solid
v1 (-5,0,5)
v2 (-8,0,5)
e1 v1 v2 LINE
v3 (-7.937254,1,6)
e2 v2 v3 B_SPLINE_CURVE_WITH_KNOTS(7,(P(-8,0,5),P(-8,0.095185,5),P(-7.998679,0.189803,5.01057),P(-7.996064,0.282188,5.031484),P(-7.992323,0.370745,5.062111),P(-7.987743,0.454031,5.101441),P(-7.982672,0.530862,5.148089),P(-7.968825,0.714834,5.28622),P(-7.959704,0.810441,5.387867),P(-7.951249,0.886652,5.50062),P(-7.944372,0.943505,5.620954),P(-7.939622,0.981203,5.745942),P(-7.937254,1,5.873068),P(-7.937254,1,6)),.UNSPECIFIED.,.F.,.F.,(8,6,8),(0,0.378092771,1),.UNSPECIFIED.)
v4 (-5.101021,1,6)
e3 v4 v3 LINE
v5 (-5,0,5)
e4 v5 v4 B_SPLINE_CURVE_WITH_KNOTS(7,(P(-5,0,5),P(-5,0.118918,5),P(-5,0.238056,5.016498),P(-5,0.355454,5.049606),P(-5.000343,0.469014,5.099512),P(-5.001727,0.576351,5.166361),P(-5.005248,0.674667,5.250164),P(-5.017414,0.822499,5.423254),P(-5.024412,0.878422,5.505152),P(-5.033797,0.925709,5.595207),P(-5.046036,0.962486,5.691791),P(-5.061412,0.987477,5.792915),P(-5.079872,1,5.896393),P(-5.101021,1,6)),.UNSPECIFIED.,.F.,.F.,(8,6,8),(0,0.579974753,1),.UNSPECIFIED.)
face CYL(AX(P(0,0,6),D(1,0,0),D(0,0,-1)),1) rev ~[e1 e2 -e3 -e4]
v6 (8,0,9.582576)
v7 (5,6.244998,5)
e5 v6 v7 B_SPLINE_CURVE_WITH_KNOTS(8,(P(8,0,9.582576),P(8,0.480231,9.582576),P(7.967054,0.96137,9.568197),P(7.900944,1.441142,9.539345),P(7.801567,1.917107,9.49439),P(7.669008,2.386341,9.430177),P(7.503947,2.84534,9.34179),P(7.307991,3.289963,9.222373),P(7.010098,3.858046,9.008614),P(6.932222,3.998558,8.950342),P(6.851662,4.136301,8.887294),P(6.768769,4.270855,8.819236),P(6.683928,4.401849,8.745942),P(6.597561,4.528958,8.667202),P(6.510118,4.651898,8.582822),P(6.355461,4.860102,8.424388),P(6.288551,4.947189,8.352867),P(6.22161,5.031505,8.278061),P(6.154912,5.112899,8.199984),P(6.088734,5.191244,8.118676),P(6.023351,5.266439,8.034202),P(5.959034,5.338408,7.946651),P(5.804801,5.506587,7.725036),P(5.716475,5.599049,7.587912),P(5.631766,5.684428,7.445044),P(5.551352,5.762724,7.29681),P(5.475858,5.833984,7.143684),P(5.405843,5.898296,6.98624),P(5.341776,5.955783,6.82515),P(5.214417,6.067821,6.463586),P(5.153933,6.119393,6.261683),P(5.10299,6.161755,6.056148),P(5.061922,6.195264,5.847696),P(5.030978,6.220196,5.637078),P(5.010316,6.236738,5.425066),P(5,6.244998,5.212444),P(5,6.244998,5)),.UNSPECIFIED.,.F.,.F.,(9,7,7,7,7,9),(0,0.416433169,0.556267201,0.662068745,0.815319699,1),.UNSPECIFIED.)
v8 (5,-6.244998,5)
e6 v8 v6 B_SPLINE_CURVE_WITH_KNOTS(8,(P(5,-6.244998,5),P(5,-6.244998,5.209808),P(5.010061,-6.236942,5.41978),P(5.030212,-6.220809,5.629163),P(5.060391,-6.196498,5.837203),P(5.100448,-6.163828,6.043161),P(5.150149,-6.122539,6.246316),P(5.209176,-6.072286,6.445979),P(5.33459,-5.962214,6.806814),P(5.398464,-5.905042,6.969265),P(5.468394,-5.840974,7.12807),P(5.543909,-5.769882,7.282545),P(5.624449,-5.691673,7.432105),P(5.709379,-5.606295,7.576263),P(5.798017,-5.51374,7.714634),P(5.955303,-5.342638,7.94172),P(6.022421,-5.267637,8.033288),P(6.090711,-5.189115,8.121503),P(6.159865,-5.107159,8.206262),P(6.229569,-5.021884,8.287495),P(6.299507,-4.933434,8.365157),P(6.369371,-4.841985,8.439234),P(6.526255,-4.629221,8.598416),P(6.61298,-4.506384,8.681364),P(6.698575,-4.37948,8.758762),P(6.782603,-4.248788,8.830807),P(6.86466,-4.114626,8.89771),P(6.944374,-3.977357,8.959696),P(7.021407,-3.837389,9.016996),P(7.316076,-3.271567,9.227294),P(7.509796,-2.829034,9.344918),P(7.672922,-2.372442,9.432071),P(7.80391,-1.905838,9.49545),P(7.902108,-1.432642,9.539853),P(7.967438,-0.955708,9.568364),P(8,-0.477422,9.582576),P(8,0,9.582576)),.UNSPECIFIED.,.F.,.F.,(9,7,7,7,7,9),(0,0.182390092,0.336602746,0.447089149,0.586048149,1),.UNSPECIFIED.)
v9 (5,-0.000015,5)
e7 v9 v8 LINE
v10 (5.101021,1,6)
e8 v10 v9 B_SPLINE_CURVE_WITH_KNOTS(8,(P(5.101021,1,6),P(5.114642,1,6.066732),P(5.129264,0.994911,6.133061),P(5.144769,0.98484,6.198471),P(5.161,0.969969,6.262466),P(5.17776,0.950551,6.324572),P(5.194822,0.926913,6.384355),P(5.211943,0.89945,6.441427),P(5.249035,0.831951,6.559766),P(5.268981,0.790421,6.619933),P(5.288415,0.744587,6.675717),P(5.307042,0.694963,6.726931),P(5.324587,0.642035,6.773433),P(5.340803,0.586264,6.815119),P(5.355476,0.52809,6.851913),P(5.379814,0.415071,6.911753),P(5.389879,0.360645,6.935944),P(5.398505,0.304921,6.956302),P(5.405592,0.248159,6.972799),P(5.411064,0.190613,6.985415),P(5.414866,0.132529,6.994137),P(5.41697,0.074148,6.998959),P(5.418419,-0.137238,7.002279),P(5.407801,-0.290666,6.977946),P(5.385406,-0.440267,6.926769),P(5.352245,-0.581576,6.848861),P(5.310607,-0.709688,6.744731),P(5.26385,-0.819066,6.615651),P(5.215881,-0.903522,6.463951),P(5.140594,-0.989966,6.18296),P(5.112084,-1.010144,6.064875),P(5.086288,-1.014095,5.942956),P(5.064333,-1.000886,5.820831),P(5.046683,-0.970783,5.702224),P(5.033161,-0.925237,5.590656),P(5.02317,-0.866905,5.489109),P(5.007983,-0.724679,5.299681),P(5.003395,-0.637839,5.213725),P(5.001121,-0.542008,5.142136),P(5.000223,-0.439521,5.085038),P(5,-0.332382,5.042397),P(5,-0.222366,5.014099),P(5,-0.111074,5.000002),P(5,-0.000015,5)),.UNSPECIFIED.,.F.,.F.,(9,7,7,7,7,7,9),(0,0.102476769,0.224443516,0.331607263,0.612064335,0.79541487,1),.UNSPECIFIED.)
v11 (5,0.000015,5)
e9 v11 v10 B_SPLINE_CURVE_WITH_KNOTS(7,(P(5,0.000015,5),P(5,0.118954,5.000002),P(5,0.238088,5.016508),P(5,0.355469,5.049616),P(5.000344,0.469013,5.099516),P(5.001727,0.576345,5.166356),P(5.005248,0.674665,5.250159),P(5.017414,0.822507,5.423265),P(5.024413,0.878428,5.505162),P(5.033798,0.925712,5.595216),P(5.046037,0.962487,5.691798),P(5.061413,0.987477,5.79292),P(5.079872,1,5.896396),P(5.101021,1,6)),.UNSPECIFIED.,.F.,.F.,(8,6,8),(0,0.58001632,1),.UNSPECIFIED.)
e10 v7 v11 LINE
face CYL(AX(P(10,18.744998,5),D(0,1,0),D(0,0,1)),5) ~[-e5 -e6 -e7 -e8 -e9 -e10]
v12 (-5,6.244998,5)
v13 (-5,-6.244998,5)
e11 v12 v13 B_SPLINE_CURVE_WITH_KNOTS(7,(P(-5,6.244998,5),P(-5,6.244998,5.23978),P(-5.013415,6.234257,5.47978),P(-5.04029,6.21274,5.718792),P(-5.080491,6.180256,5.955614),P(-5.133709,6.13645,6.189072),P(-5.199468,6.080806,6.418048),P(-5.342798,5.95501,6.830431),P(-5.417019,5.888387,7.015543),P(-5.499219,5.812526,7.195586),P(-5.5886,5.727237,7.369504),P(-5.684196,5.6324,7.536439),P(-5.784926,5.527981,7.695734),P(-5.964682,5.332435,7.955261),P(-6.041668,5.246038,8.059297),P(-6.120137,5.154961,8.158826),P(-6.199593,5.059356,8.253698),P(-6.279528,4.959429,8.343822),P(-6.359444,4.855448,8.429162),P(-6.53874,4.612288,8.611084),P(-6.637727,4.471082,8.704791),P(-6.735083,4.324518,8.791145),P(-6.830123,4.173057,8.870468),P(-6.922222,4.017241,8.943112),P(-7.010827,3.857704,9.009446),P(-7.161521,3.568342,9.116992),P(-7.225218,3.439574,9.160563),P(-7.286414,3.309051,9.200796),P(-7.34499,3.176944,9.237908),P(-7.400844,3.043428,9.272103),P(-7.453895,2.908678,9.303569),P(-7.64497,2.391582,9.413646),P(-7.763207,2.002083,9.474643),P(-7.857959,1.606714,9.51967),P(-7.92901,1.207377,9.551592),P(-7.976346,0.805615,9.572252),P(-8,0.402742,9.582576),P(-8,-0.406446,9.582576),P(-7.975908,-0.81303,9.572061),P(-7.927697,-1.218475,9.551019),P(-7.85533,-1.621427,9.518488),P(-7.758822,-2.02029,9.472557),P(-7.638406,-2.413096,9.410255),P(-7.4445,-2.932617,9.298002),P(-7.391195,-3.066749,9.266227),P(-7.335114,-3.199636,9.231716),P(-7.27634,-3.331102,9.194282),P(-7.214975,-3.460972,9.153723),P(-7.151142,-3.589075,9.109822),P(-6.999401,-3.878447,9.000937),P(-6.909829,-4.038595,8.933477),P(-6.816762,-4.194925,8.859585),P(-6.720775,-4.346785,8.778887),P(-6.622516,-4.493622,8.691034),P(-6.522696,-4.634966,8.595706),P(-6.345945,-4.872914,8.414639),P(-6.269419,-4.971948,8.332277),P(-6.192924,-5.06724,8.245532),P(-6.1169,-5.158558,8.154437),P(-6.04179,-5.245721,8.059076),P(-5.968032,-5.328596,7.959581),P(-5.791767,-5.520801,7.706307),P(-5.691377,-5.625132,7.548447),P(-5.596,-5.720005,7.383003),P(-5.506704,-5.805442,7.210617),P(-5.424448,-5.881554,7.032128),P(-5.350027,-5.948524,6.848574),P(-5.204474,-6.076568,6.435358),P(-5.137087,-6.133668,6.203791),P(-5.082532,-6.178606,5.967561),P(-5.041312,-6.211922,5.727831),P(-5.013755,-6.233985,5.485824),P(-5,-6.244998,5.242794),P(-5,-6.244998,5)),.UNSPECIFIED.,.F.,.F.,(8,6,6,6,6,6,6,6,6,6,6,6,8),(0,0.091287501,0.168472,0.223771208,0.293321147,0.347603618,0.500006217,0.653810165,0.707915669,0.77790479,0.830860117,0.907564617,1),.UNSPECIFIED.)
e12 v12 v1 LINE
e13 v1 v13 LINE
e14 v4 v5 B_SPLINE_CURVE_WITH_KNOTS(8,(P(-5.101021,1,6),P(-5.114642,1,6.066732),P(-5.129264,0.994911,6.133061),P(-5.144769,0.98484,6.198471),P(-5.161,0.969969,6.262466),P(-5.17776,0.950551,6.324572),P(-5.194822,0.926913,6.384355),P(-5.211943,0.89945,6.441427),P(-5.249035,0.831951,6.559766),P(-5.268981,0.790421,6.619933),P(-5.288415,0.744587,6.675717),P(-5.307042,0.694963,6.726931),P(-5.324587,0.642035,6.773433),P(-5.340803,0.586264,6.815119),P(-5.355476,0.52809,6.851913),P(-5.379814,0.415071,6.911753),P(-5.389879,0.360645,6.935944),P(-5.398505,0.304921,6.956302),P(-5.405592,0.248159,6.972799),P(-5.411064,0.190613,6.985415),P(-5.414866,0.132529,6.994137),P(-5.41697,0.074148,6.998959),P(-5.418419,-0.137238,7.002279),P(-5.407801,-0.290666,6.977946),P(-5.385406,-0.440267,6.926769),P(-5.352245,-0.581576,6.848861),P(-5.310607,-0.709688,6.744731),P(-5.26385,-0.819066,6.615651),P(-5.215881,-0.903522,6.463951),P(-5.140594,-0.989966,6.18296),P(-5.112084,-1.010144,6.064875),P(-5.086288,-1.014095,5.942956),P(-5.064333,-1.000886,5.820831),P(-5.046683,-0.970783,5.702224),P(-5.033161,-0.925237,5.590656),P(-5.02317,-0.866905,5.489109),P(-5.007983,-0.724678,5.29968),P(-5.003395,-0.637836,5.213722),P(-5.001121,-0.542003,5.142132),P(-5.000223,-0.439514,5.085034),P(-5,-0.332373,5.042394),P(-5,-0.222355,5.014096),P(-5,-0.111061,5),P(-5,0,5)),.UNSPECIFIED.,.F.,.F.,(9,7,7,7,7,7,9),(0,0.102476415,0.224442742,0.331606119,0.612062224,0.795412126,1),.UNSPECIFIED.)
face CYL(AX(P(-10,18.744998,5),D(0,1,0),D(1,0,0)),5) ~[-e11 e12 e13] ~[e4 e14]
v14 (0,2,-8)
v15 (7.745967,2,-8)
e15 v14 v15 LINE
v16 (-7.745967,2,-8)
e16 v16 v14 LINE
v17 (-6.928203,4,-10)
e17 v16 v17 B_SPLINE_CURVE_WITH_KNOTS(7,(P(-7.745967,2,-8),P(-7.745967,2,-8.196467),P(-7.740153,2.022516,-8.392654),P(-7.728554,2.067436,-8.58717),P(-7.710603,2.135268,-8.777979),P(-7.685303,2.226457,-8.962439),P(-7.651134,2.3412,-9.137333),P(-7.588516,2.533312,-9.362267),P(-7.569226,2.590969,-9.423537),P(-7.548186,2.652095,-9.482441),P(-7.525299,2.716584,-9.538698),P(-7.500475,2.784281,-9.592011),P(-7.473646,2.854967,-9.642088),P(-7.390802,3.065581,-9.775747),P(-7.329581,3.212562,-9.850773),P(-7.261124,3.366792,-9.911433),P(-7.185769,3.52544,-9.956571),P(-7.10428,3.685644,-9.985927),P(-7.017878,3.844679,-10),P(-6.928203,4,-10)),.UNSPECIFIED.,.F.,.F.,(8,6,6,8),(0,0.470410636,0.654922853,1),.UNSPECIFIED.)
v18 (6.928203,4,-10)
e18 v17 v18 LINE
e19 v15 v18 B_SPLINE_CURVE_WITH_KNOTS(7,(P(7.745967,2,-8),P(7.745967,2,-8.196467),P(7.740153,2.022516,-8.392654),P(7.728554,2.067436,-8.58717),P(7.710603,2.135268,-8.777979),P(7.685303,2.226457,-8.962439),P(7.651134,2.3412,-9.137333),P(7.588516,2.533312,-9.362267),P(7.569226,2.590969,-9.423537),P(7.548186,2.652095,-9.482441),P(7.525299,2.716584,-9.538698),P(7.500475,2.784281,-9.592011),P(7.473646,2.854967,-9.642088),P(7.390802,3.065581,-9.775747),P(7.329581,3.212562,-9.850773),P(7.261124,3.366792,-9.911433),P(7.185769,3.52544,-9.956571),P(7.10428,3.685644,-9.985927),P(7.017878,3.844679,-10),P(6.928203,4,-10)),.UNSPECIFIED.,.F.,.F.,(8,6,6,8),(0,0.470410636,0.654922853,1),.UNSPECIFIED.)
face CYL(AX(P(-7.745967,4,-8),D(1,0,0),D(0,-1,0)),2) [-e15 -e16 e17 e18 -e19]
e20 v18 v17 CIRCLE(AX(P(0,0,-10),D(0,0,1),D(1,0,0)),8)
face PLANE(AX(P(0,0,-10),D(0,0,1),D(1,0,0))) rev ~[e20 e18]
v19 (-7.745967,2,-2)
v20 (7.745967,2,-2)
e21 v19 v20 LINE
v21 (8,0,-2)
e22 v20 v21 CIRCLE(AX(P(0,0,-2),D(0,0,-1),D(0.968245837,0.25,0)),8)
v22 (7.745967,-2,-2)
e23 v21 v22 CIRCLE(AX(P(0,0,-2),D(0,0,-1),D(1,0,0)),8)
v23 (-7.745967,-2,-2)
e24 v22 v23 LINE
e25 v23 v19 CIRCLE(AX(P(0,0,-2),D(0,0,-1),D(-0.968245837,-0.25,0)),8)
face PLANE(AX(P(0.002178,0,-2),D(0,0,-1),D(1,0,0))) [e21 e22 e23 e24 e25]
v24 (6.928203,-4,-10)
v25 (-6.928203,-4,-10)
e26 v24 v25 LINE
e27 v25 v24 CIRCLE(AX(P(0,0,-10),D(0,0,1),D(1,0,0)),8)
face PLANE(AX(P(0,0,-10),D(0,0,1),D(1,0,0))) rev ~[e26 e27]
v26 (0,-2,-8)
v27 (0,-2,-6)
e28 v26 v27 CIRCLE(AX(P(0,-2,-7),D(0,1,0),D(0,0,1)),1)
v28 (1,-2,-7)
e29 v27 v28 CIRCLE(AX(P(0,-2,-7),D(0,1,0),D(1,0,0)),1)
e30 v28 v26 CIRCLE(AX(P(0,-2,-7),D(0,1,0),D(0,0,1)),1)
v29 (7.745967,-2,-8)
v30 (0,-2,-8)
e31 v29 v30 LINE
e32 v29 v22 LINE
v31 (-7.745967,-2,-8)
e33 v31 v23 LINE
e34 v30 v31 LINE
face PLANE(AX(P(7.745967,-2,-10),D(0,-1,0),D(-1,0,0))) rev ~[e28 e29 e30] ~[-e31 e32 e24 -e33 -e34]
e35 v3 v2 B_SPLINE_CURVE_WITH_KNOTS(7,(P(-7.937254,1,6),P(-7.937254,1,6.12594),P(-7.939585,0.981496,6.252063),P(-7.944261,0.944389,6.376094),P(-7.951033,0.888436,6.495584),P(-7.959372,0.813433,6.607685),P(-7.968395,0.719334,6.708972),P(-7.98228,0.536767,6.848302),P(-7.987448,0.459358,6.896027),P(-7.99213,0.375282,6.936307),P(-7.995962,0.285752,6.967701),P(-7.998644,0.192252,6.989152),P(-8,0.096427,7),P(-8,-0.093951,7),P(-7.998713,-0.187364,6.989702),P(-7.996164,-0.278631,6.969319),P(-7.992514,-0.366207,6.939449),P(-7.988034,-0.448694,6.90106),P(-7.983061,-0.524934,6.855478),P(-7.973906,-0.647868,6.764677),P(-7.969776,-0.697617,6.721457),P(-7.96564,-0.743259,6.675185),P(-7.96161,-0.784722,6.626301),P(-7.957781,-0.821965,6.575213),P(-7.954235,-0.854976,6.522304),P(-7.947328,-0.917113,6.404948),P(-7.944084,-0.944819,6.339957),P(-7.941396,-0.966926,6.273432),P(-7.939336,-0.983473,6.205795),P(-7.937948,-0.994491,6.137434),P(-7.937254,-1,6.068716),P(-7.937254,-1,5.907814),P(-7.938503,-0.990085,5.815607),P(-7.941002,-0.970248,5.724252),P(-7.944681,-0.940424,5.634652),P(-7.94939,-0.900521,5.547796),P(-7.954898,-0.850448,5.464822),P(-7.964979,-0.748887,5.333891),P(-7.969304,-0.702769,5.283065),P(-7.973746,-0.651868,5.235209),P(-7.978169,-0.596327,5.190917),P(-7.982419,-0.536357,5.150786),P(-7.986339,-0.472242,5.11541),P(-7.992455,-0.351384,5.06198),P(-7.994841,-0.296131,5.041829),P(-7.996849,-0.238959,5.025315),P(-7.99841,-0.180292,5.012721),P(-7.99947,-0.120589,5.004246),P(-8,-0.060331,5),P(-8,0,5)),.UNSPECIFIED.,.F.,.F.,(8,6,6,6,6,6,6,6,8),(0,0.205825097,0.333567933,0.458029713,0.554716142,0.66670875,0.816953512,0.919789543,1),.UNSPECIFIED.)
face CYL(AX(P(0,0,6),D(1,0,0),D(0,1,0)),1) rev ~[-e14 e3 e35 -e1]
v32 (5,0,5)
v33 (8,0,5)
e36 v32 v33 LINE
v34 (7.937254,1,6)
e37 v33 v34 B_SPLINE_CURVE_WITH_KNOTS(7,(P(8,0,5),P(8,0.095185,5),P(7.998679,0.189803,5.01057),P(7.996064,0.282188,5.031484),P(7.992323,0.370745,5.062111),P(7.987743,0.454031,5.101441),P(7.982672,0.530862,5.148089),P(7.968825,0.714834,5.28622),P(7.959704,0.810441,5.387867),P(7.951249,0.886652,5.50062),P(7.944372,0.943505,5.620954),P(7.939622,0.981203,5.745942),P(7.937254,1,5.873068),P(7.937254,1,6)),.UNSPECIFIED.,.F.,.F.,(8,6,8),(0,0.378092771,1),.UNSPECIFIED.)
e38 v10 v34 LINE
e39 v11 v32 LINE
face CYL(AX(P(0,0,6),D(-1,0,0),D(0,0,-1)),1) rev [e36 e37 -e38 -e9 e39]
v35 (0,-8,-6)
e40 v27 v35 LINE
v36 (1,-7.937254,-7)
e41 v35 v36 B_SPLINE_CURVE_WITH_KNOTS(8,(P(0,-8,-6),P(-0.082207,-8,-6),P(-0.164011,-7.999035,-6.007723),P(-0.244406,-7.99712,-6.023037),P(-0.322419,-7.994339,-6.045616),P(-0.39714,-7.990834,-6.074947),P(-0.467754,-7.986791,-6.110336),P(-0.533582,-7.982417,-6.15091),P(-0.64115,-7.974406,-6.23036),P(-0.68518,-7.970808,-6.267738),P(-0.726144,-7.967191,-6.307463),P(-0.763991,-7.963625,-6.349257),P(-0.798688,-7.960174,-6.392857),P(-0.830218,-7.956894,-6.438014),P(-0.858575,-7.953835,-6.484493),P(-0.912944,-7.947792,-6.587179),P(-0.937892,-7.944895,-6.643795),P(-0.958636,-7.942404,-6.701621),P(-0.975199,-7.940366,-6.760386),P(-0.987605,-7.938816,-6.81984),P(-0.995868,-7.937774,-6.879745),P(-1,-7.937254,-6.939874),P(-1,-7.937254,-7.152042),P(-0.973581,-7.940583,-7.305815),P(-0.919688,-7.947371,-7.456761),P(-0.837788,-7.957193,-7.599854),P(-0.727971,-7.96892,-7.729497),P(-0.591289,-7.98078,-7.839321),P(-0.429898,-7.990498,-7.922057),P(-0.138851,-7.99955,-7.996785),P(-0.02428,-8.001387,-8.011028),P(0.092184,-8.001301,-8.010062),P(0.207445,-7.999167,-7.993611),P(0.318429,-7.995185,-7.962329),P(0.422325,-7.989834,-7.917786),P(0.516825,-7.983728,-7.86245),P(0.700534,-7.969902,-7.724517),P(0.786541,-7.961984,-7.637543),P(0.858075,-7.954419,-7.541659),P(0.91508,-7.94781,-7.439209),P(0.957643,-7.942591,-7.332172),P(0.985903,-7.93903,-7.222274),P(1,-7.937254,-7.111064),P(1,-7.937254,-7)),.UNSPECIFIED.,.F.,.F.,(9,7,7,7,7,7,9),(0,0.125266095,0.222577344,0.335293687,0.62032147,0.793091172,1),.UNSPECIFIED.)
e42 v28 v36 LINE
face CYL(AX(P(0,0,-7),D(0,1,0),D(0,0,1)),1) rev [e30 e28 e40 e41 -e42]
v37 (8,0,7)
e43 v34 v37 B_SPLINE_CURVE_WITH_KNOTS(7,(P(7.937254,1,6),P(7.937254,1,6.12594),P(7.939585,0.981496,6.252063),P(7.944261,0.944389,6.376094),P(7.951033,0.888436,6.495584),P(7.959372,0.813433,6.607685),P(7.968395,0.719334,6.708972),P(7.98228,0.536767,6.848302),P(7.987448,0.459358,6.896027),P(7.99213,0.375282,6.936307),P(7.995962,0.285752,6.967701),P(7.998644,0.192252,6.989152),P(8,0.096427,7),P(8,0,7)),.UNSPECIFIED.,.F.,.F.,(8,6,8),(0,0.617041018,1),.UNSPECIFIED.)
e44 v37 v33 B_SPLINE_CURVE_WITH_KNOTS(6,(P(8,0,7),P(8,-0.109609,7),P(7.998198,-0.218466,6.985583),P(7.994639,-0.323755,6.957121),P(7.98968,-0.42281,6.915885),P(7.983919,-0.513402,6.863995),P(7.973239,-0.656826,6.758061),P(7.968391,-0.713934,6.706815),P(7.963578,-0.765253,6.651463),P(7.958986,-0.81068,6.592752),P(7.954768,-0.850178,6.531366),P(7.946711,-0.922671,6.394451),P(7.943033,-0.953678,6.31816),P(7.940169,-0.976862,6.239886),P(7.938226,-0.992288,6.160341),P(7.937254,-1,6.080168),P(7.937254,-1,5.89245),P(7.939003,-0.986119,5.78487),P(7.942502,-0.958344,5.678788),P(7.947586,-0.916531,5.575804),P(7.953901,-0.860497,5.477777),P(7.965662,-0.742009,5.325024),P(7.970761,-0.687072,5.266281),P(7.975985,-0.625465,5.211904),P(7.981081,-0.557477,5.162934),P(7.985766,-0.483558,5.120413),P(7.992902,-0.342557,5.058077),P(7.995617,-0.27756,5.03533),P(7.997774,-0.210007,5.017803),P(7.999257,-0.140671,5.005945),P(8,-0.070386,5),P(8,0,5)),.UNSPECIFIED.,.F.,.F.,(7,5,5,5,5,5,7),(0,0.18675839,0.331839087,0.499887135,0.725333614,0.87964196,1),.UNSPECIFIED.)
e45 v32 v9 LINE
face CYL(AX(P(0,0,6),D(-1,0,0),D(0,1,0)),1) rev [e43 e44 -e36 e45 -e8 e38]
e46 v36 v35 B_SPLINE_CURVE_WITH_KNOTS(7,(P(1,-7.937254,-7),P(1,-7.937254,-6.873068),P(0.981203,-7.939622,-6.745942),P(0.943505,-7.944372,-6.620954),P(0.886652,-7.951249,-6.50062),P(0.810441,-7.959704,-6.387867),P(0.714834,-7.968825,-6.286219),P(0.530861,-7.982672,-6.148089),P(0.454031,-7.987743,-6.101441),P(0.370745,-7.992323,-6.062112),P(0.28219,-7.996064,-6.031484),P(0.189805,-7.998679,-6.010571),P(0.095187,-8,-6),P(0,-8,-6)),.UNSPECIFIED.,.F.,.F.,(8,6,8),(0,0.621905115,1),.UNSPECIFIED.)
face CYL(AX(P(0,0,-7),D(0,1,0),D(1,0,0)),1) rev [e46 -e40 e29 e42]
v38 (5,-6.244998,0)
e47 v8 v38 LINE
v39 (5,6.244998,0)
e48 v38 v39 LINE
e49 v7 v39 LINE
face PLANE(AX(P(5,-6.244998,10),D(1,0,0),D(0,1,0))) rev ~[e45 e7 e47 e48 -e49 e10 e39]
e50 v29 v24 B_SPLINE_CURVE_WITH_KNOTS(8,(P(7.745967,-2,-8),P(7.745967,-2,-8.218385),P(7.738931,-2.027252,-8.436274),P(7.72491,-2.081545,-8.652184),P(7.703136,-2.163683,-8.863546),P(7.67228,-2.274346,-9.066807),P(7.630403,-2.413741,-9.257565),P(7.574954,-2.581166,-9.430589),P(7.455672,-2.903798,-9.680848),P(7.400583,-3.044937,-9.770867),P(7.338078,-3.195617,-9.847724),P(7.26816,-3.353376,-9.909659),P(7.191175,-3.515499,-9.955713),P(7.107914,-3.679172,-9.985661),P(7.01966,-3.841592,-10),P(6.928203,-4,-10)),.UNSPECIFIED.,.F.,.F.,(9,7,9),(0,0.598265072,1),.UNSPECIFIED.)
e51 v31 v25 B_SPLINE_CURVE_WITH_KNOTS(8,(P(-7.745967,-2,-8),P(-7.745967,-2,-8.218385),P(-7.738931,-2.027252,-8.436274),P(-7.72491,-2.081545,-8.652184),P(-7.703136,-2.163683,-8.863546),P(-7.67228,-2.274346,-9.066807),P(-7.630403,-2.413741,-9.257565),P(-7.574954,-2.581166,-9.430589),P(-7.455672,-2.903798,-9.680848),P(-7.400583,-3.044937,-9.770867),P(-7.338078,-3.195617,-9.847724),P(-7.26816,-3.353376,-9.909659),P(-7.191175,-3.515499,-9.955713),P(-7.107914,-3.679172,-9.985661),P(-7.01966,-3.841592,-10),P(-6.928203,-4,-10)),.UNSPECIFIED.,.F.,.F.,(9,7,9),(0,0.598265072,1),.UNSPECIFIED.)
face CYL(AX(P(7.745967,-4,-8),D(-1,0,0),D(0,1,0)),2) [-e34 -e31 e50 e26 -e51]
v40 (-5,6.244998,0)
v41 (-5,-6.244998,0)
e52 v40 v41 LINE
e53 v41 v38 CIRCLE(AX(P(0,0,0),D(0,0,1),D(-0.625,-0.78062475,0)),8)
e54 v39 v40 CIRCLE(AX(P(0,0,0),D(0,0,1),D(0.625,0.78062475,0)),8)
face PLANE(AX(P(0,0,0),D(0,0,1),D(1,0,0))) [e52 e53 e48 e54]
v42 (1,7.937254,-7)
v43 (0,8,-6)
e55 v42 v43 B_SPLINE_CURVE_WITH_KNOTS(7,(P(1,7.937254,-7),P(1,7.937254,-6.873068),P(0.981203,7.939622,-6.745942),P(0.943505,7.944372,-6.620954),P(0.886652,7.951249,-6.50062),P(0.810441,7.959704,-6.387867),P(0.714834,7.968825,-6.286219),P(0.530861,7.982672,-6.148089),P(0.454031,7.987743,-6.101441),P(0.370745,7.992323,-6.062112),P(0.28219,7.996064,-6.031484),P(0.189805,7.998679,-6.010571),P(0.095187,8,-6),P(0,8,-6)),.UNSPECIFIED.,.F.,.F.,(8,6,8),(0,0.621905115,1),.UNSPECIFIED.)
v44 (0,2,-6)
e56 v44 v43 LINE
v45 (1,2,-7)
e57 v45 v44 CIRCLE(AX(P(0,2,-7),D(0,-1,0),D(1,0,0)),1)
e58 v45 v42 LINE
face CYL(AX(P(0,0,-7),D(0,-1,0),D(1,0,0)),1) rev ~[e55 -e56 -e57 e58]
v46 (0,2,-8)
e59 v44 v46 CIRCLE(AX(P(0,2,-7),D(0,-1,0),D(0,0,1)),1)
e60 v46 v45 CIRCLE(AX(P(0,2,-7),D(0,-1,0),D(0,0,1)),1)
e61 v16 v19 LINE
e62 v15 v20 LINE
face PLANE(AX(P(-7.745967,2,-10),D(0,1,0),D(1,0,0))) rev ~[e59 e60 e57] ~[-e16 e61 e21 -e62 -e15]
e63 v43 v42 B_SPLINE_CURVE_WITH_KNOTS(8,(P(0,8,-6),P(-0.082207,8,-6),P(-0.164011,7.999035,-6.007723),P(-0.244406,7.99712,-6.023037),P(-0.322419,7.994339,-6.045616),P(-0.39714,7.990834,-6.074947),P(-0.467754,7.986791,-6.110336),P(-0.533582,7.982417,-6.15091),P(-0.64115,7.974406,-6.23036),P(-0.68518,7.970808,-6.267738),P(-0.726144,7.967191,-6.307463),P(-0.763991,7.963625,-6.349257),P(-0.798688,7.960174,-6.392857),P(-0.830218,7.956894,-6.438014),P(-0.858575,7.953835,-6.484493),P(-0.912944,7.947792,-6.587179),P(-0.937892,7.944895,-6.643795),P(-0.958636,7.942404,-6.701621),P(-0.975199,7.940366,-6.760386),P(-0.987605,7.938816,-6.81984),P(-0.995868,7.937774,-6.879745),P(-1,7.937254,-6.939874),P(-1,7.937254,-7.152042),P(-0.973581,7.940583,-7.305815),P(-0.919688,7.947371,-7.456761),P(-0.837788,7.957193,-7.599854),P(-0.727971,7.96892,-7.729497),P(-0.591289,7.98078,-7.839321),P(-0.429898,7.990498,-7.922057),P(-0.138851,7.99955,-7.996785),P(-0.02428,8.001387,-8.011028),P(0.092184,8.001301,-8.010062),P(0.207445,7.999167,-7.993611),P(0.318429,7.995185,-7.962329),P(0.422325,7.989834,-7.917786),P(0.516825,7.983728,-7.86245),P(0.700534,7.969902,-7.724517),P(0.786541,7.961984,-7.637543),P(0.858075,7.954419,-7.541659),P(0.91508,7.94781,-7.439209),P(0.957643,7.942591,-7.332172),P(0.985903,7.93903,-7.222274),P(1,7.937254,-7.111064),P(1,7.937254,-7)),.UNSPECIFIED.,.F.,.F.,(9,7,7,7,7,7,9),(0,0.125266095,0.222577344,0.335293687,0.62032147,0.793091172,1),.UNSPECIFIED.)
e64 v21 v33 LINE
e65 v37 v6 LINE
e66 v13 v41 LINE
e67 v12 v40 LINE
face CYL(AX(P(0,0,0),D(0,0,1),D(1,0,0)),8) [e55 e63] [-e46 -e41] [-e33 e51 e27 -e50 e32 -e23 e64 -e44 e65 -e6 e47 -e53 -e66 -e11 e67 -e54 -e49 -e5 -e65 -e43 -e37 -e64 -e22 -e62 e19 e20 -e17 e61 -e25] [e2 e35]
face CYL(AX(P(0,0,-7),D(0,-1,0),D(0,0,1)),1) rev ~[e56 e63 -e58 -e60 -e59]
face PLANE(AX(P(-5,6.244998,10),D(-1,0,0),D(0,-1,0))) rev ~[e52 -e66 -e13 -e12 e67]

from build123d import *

# Parameters (mm, degrees)
F0_R        = 8
F1_DEPTH    = 10
F3_DEPTH    = 10
F5_DEPTH    = 8
F6_R        = 2
F7_T1_DEPTH = 37.4899959968
F9_DEPTH    = 12.5
F11_DEPTH   = 12.5


# Not quite as in the source:
# - a fillet or chamfer that OpenCascade refuses, or shapes differently, is made with other operations: its cross-section is extruded or revolved along the edge and cut away or added


with BuildPart() as f1:
    # F0 (on Top) → F1 (new body, symmetric)
    with BuildSketch(Plane.XY):
        Circle(F0_R)
    extrude(amount=F1_DEPTH, both=True)

    # F2 (on face) → F3 (cut)
    with BuildSketch(Plane.XY.offset(10)):
        with BuildLine():
            ThreePointArc((5, 6.2449979984), (0, 8), (-5, 6.2449979984))
            Line((-5, 6.2449979984), (-5, -6.2449979984))
            ThreePointArc((-5, -6.2449979984), (0, -8), (5, -6.2449979984))
            Line((5, -6.2449979984), (5, 6.2449979984))
        make_face()
    extrude(amount=-F3_DEPTH, mode=Mode.SUBTRACT)

    # F4 (on face) → F5 (cut)
    with BuildSketch(Plane(origin=(0, 0, -10), x_dir=(1, 0, 0), z_dir=(0, 0, -1))):
        with BuildLine():
            Line((7.7459666924, 2), (-7.7459666924, 2))
            ThreePointArc((-7.7459666924, 2), (-8, 0), (-7.7459666924, -2))
            Line((-7.7459666924, -2), (7.7459666924, -2))
            ThreePointArc((7.7459666924, -2), (7.9362375701, -1.0080343399), (8, 0))
            ThreePointArc((8, 0), (7.9362375701, 1.0080343399), (7.7459666924, 2))
        make_face()
    extrude(amount=-F5_DEPTH, mode=Mode.SUBTRACT)

    # F6
    f6_edges = [f1.edges().sort_by_distance(p)[0] for p in [
        (0, 2, -10),
        (0, -2, -10),
    ]]
    fillet(f6_edges, radius=F6_R)

    # F7: fillet of radius 5 on 2 edges, made by hand

    # F7_s2 → F7_t1 (cut)
    with BuildSketch(Plane.XZ.offset(-18.7449979984)):
        with BuildLine():
            ThreePointArc((-5, 5), (-6.4644660941, 8.5355339059), (-10, 10))
            Line((-10, 10), (-5, 10))
            Line((-5, 10), (-5, 5))
        make_face()
        with BuildLine():
            ThreePointArc((10, 10), (6.4644660941, 8.5355339059), (5, 5))
            Line((5, 5), (5, 10))
            Line((5, 10), (10, 10))
        make_face()
    extrude(amount=F7_T1_DEPTH, mode=Mode.SUBTRACT)

    # F8 (on Right) → F9 (cut, symmetric)
    with BuildSketch(Plane.YZ):
        with BuildLine():
            ThreePointArc((0, 5), (0.7071067812, 5.2928932188), (1, 6))
            ThreePointArc((1, 6), (-0.7071067812, 6.7071067812), (0, 5))
        make_face()
    extrude(amount=F9_DEPTH, both=True, mode=Mode.SUBTRACT)

    # F10 (on Front) → F11 (cut, symmetric)
    with BuildSketch(Plane.XZ):
        with BuildLine():
            ThreePointArc((0, -6), (-0.7071067812, -7.7071067812), (1, -7))
            ThreePointArc((1, -7), (0.7071067812, -6.2928932188), (0, -6))
        make_face()
    extrude(amount=F11_DEPTH, both=True, mode=Mode.SUBTRACT)


solid = f1.part
